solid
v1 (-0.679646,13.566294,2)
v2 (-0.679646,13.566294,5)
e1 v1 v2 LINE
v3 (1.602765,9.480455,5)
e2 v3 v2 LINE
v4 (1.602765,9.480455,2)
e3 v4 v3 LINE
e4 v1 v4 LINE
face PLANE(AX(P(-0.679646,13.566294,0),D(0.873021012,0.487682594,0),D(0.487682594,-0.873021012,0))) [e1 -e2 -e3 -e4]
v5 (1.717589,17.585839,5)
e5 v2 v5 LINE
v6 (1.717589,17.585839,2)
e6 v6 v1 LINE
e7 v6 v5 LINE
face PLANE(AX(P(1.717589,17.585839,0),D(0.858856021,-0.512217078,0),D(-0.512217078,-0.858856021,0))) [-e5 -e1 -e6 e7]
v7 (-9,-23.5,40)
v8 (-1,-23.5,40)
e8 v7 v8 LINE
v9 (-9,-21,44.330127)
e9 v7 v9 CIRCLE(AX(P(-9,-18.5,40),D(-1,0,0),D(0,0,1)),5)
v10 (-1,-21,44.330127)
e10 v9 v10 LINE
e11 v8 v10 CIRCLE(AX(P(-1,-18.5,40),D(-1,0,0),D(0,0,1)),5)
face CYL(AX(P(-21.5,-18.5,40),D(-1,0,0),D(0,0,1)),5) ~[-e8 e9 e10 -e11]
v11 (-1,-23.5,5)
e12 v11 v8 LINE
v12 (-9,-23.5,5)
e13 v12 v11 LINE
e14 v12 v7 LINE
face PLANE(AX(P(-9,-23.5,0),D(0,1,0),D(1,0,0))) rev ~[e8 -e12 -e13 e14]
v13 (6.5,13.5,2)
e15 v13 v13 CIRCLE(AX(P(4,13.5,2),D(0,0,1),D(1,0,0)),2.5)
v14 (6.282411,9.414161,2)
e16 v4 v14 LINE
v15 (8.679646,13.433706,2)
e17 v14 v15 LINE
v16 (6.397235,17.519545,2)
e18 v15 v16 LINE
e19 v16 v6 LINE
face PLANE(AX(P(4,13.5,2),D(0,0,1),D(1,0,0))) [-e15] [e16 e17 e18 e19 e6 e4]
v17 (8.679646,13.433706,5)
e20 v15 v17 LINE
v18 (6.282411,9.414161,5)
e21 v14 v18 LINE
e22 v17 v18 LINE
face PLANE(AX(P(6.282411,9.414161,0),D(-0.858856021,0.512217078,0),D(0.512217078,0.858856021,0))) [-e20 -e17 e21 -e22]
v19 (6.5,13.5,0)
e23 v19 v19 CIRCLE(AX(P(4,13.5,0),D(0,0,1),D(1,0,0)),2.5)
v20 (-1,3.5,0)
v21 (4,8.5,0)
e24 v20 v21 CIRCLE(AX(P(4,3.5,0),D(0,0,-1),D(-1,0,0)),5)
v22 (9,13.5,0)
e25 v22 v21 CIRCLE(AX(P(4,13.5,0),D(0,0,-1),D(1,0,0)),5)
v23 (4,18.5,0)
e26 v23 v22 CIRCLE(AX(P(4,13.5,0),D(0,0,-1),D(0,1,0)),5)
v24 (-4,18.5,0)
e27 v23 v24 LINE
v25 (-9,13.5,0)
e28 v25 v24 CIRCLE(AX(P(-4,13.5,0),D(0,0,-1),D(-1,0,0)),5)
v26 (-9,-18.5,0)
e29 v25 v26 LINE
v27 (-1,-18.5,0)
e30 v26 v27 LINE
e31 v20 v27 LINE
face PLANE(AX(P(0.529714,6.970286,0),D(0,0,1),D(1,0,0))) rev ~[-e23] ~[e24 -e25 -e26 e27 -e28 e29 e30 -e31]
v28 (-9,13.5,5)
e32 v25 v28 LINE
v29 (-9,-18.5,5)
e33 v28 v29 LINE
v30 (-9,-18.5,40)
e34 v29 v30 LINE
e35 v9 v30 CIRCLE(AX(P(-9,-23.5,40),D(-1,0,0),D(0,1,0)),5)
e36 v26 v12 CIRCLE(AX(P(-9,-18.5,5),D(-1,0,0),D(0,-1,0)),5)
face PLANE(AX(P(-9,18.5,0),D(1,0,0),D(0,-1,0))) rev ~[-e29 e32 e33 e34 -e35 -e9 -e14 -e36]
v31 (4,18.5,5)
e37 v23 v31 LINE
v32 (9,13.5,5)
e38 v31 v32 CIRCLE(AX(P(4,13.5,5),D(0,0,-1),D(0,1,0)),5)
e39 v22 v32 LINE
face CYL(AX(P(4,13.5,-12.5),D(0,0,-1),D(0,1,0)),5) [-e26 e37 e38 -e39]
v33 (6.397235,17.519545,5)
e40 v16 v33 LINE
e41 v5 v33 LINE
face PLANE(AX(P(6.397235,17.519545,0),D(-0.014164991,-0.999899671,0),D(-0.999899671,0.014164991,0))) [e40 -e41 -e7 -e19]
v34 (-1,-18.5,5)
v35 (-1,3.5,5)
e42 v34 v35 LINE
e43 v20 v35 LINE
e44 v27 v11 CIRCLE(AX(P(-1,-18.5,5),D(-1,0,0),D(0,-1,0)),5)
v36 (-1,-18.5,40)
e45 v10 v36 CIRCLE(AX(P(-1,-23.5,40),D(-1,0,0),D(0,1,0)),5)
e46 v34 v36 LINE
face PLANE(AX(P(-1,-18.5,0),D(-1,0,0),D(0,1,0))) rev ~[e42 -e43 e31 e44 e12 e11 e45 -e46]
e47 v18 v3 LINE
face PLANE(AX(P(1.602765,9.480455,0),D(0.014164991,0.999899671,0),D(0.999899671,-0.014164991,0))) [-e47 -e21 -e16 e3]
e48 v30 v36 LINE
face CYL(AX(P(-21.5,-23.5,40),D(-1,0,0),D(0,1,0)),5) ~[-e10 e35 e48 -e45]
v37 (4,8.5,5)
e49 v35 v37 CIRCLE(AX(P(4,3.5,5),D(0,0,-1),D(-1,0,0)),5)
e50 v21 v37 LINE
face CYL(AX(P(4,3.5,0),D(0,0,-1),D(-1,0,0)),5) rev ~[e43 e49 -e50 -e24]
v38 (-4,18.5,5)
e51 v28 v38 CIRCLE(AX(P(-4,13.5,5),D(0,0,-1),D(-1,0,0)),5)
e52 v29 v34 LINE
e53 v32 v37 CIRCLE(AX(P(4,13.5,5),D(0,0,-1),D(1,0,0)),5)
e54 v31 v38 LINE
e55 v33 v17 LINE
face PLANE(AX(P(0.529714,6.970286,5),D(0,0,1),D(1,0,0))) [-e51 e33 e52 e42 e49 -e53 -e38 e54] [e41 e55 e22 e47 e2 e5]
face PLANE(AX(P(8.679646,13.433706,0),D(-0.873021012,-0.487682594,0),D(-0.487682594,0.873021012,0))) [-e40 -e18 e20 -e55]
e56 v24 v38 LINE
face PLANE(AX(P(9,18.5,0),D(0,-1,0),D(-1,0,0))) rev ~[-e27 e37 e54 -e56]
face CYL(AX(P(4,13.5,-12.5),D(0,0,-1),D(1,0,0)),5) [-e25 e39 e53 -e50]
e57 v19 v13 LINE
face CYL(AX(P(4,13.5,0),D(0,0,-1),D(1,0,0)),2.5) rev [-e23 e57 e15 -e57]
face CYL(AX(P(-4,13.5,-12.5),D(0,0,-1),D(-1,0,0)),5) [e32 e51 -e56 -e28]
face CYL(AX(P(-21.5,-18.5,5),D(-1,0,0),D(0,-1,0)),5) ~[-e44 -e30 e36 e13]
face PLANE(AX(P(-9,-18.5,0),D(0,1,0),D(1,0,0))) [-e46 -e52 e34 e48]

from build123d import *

# Parameters (mm, degrees)
F0_W        = 8
F0_H        = 5
F1_DEPTH    = 45
F0_R        = 2.5
F2_DEPTH    = 5
F3_DEPTH    = 10
F4_DEPTH    = 2
F5_T1_DEPTH = 5
F5_T3_DEPTH = 30
F5_T5_DEPTH = 33


# Not quite as in the source:
# - a fillet or chamfer that OpenCascade refuses, or shapes differently, is made with other operations: its cross-section is extruded or revolved along the edge and cut away or added


with BuildPart() as f1:
    # F0 (on Top) → F1 (new body)
    with BuildSketch(Plane.XY):
        with Locations((-5, -21)):
            Rectangle(F0_W, F0_H)
    extrude(amount=F1_DEPTH)

    # F0 (on Top) → F2 (join)
    with BuildSketch(Plane.XY):
        Polygon((9, 18.5), (-9, 18.5), (-9, -18.5), (-1, -18.5), (-1, 8.5), (9, 8.5), align=None)
        Polygon((1.6027649533, 9.4804546863), (-0.6796458767, 13.5662937924), (1.71758917, 17.5858391061), (6.3972350467, 17.5195453137), (8.6796458767, 13.4337062076), (6.28241083, 9.4141608939), align=None, mode=Mode.SUBTRACT)
        Polygon((1.71758917, 17.5858391061), (-0.6796458767, 13.5662937924), (1.6027649533, 9.4804546863), (6.28241083, 9.4141608939), (8.6796458767, 13.4337062076), (6.3972350467, 17.5195453137), align=None)
        with Locations((4, 13.5)):
            Circle(F0_R, mode=Mode.SUBTRACT)
    extrude(amount=F2_DEPTH)

    # F0 (on Top) → F3 (cut)
    with BuildSketch(Plane.XY):
        Polygon((1.71758917, 17.5858391061), (-0.6796458767, 13.5662937924), (1.6027649533, 9.4804546863), (6.28241083, 9.4141608939), (8.6796458767, 13.4337062076), (6.3972350467, 17.5195453137), align=None)
        with Locations((4, 13.5)):
            Circle(F0_R, mode=Mode.SUBTRACT)
    extrude(amount=F3_DEPTH, mode=Mode.SUBTRACT)

    # F0 (on Top) → F4 (join)
    with BuildSketch(Plane.XY):
        Polygon((1.71758917, 17.5858391061), (-0.6796458767, 13.5662937924), (1.6027649533, 9.4804546863), (6.28241083, 9.4141608939), (8.6796458767, 13.4337062076), (6.3972350467, 17.5195453137), align=None)
        with Locations((4, 13.5)):
            Circle(F0_R, mode=Mode.SUBTRACT)
    extrude(amount=F4_DEPTH)

    # F5: fillet of radius 5 on 7 edges, made by hand

    # F5_s2 → F5_t1 (join)
    with BuildSketch(Plane.XY):
        with BuildLine():
            ThreePointArc((-1, 3.5), (0.4644660941, 7.0355339059), (4, 8.5))
            Line((4, 8.5), (-1, 8.5))
            Line((-1, 8.5), (-1, 3.5))
        make_face()
    extrude(amount=F5_T1_DEPTH)

    # F5_s4 → F5_t3 (cut)
    with BuildSketch(Plane.XY.offset(-12.5)):
        with BuildLine():
            ThreePointArc((-9, 13.5), (-7.5355339059, 17.0355339059), (-4, 18.5))
            Line((-4, 18.5), (-9, 18.5))
            Line((-9, 18.5), (-9, 13.5))
        make_face()
        with BuildLine():
            ThreePointArc((4, 18.5), (7.5355339059, 17.0355339059), (9, 13.5))
            Line((9, 13.5), (9, 18.5))
            Line((9, 18.5), (4, 18.5))
        make_face()
        with BuildLine():
            ThreePointArc((9, 13.5), (7.5355339059, 9.9644660941), (4, 8.5))
            Line((4, 8.5), (9, 8.5))
            Line((9, 8.5), (9, 13.5))
        make_face()
    extrude(amount=F5_T3_DEPTH, mode=Mode.SUBTRACT)

    # F5_s6 → F5_t5 (cut)
    with BuildSketch(Plane.YZ.offset(-21.5)):
        with BuildLine():
            ThreePointArc((-23.5, 5), (-22.0355339059, 1.4644660941), (-18.5, 0))
            Line((-18.5, 0), (-23.5, 0))
            Line((-23.5, 0), (-23.5, 5))
        make_face()
        with BuildLine():
            ThreePointArc((-18.5, 45), (-22.0355339059, 43.5355339059), (-23.5, 40))
            Line((-23.5, 40), (-23.5, 45))
            Line((-23.5, 45), (-18.5, 45))
        make_face()
        with BuildLine():
            ThreePointArc((-18.5, 40), (-19.9644660941, 43.5355339059), (-23.5, 45))
            Line((-23.5, 45), (-18.5, 45))
            Line((-18.5, 45), (-18.5, 40))
        make_face()
    extrude(amount=F5_T5_DEPTH, mode=Mode.SUBTRACT)


solid = f1.part
